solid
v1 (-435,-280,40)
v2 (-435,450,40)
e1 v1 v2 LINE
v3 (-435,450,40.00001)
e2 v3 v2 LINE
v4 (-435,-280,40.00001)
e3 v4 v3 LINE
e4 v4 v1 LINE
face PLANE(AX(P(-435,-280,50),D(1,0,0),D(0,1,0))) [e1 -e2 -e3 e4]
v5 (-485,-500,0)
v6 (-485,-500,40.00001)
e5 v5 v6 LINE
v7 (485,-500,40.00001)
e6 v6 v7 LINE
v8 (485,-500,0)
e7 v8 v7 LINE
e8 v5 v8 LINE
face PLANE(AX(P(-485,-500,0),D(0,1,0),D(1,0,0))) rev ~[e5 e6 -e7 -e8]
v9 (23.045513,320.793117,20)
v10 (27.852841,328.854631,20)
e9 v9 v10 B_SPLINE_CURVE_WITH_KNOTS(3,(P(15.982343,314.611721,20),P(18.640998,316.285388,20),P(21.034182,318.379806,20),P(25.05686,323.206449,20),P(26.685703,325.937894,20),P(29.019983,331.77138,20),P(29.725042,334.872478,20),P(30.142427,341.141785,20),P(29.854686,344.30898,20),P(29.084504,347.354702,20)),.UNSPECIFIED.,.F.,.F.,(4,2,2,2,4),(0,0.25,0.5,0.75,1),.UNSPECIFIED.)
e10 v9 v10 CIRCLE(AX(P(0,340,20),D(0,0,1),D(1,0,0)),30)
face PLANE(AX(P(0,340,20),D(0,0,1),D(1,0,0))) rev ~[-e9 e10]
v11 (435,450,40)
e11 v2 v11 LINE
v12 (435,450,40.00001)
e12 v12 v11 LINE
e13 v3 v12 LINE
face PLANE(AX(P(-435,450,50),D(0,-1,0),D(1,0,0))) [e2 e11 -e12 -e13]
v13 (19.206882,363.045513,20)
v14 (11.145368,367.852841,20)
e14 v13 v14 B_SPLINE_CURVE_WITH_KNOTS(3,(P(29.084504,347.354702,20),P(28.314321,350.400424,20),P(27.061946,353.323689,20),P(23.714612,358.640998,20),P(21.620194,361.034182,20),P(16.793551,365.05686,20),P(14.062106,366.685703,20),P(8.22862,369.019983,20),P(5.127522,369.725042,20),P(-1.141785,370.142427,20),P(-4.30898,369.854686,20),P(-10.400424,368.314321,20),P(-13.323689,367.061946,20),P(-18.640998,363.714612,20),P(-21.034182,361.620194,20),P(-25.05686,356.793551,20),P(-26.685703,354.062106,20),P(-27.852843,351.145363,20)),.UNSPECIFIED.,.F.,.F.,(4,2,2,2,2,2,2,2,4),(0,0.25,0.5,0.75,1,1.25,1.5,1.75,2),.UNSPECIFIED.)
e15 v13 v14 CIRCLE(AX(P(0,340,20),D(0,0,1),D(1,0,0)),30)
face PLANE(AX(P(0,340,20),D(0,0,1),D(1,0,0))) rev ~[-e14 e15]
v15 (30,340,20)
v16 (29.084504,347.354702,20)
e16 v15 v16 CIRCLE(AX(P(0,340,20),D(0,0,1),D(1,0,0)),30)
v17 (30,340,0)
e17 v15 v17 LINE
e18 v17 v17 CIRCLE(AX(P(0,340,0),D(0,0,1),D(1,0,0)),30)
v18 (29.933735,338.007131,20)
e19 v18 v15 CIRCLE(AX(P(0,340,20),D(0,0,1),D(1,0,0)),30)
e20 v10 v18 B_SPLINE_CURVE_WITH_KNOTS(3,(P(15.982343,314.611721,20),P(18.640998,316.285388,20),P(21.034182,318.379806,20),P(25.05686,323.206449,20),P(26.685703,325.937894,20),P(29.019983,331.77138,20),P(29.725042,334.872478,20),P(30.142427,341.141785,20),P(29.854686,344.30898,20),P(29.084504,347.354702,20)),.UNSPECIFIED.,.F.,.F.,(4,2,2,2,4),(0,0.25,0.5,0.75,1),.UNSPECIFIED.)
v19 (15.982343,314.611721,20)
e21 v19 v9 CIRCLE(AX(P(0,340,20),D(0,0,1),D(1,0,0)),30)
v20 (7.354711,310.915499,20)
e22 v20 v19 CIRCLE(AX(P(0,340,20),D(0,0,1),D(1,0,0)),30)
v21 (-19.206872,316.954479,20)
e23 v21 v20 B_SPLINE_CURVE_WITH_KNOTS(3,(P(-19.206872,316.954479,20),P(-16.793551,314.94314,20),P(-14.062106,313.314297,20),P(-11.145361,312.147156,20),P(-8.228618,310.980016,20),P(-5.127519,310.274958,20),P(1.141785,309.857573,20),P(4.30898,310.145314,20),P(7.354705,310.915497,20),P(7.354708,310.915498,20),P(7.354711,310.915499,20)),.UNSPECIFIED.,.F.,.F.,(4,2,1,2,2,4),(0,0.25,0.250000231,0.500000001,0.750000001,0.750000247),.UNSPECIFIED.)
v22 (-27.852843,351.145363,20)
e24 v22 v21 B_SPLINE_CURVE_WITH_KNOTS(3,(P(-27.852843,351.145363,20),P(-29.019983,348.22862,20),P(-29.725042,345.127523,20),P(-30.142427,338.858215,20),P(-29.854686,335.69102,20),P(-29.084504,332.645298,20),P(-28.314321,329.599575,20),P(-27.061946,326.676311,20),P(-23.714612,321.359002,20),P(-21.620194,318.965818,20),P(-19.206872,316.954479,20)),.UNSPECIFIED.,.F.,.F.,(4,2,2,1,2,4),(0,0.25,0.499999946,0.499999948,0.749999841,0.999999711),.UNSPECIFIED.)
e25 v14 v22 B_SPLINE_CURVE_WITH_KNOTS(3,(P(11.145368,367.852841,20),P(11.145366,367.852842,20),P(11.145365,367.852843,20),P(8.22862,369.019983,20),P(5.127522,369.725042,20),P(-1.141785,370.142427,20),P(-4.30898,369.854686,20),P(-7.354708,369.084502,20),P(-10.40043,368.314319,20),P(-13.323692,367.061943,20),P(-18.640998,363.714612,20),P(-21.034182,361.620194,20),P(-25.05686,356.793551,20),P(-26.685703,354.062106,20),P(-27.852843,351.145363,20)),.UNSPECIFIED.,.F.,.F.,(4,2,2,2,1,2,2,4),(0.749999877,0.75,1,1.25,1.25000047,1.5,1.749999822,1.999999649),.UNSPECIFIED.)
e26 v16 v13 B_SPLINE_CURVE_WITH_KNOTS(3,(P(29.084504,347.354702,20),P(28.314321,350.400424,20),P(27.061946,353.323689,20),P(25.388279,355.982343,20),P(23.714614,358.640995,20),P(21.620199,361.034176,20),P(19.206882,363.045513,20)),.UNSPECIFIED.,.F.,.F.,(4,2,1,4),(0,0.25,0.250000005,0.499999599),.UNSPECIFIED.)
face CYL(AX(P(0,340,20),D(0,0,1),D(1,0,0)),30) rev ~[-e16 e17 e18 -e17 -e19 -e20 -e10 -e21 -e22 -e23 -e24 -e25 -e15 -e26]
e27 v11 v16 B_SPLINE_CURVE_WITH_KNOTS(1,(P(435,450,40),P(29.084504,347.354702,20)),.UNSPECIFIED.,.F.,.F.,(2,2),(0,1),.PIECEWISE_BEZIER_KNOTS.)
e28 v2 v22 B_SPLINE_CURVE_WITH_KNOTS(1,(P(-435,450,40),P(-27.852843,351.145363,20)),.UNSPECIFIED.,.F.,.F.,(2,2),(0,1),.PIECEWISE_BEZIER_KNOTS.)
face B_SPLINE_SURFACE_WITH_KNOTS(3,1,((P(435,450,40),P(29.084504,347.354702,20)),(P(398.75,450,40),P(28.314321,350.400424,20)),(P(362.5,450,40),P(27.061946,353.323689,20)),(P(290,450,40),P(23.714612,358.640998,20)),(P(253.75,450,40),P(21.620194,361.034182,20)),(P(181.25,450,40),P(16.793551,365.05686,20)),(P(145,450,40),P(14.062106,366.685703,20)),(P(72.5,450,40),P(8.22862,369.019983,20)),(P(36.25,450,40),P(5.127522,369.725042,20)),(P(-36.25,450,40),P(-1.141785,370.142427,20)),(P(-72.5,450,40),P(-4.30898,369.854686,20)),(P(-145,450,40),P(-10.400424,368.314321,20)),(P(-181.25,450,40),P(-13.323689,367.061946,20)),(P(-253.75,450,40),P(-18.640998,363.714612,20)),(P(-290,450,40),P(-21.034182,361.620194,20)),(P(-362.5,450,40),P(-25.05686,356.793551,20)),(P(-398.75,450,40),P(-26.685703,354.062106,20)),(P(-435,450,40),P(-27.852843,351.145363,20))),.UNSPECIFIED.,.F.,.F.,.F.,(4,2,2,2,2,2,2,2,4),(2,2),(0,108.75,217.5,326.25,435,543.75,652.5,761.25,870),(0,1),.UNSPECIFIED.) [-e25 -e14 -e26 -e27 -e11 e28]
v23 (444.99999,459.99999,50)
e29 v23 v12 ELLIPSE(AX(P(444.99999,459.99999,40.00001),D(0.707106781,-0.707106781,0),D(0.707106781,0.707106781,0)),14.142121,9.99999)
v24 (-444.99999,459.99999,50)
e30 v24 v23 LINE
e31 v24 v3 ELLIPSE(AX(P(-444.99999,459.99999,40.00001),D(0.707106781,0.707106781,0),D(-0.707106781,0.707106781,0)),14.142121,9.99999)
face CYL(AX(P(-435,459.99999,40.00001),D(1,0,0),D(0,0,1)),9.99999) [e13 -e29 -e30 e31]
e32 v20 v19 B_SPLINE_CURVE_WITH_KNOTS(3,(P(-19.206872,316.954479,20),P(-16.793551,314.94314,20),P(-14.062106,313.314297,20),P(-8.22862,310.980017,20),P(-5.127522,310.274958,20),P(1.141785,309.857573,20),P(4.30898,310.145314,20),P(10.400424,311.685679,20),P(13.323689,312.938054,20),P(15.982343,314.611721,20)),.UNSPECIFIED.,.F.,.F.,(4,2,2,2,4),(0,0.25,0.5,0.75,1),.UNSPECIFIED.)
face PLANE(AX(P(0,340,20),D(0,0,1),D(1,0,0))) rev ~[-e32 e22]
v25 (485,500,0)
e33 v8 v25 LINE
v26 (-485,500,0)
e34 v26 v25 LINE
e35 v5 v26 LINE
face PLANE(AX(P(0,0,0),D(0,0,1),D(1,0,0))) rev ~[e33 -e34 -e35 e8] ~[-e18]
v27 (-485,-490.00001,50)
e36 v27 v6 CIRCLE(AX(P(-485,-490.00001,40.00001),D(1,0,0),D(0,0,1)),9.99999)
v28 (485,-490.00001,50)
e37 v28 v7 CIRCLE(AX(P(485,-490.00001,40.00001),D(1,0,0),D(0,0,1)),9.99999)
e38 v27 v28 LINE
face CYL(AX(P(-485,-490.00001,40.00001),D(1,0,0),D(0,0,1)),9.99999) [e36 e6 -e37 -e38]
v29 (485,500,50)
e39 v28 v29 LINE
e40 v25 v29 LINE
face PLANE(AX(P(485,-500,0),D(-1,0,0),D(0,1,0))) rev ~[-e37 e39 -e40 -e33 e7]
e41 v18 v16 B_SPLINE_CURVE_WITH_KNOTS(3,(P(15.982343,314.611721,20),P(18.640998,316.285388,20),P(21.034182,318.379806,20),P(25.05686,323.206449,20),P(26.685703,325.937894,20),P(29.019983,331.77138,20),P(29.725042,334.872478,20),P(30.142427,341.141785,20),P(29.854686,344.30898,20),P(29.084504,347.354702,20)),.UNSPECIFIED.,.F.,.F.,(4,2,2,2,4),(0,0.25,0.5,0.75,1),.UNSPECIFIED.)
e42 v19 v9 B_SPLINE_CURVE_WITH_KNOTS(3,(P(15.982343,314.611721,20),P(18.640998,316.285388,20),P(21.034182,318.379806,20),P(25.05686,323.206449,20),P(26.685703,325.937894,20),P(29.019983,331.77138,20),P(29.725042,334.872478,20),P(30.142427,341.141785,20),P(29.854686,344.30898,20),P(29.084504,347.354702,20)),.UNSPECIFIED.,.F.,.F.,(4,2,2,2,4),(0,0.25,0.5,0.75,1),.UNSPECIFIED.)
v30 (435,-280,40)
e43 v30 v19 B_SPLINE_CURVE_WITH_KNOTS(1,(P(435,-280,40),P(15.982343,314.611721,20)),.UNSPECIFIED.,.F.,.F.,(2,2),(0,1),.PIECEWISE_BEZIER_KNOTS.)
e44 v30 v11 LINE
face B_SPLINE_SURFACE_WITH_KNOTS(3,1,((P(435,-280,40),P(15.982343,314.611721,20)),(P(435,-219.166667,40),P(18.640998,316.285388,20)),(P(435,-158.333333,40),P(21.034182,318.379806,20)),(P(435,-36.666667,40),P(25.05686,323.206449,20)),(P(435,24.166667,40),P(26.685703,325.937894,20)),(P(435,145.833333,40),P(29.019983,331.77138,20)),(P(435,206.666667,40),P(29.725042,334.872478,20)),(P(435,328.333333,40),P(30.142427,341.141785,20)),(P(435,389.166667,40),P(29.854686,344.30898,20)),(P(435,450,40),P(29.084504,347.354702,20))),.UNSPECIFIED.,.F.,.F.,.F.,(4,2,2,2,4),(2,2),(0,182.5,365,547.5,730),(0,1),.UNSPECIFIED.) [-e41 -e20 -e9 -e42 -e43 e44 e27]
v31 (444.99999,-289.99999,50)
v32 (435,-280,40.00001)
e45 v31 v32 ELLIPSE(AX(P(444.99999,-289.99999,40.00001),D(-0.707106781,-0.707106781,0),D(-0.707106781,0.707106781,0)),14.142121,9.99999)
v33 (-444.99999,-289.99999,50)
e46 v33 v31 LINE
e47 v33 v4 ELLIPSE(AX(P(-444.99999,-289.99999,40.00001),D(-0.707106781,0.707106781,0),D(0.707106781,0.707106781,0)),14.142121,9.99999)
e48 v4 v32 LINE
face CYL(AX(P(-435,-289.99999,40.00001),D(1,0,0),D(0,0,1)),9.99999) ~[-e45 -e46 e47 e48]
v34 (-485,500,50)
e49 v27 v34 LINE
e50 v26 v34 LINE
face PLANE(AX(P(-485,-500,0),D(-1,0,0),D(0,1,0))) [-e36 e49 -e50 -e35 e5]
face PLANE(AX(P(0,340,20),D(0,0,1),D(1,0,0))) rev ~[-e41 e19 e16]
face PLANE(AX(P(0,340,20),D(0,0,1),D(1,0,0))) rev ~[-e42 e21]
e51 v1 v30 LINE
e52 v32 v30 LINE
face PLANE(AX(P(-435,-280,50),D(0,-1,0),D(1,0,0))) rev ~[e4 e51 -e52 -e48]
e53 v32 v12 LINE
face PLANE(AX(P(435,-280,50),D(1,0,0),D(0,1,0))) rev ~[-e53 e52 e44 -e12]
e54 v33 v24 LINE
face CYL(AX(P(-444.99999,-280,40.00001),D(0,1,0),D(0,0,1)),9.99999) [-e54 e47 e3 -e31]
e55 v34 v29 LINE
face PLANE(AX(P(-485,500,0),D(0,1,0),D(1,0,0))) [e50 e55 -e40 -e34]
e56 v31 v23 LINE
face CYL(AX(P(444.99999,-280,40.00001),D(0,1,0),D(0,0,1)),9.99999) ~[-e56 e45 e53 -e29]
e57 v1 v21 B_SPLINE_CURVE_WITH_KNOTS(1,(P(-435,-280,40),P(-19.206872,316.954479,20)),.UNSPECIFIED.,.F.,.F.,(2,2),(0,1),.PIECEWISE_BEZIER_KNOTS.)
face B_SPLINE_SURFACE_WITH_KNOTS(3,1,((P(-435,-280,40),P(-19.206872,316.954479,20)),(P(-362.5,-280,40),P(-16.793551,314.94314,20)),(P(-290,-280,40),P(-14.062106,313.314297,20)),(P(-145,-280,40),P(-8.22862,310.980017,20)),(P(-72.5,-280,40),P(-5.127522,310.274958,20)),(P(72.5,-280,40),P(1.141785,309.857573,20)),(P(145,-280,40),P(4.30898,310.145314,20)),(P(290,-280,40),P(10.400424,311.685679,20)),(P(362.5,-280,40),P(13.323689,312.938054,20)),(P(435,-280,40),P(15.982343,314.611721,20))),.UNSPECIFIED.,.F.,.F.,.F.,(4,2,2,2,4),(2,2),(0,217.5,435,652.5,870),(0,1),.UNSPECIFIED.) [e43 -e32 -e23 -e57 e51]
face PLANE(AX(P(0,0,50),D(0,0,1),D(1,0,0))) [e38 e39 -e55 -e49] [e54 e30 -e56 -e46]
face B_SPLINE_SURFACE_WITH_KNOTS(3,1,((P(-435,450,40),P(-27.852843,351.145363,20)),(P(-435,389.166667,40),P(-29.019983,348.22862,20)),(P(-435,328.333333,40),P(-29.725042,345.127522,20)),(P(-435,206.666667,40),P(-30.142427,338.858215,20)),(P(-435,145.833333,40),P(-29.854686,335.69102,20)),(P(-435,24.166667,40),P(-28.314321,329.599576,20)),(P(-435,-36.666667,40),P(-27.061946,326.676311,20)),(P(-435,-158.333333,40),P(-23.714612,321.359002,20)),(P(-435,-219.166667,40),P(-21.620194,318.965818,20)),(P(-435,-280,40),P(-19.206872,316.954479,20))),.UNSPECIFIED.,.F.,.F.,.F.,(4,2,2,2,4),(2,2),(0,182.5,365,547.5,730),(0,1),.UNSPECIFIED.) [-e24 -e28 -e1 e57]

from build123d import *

# Parameters (mm, degrees)
F0_W      = 970
F0_H      = 1000
F1_DEPTH  = 50
F2_W      = 870
F2_H      = 730
F5_DEPTH  = 10
F4_R      = 30
F14_DEPTH = 25
F15_R     = 9.99999


# Not quite as in the source:
# - a fillet or chamfer is up to 0.001 mm smaller than in the source, because OpenCascade refuses the exact size
# - the arcs of a loft's sections are written as splines that run evenly, so that the points pair up as in the source's solid


with BuildPart() as f1:
    # F0 (on Top) → F1 (new body)
    with BuildSketch(Plane.XY):
        Rectangle(F0_W, F0_H)
    extrude(amount=F1_DEPTH)

    # F2 (on face) → F5 (cut)
    with BuildSketch(Plane.XY.offset(50)):
        with Locations((0, 85)):
            Rectangle(F2_W, F2_H)
    extrude(amount=-F5_DEPTH, mode=Mode.SUBTRACT)

    # F12 (on 3pt) → F13 section 0
    with BuildSketch(Plane.XY.offset(40)):
        Polygon((435, -280), (435, 450), (0, 450), (-435, 450), (-435, -280), align=None)
    # F4 (on offset) → F13 section 1
    with BuildSketch(Plane.XY.offset(20)):
        with BuildLine():
            add(Edge.make_bspline(
                [(29.0845037285, 347.3547020923), (28.3143211264, 350.4004242005), (27.0619459332, 353.3236889303), (23.7146117851, 358.6409976204), (21.6201937161, 361.0341823725), (16.7935510128, 365.0568603137), (14.0621063014, 366.6857034902), (8.2286204599, 369.0199829381), (5.1275219455, 369.7250420202), (1.9928685748, 369.9337347293)],
                knots=[0, 0, 0, 0, 0.25, 0.25, 0.5, 0.5, 0.75, 0.75, 1, 1, 1, 1], degree=3))
            add(Edge.make_bspline(
                [(1.9928685748, 369.9337347293), (-1.1417847959, 370.1424274384), (-4.308979984, 369.8546863306), (-10.4004242005, 368.3143211264), (-13.3236889303, 367.0619459332), (-18.6409976204, 363.7146117851), (-21.0341823725, 361.6201937161), (-25.0568603137, 356.7935510128), (-26.6857034902, 354.0621063014), (-27.8528432142, 351.1453633807)],
                knots=[0, 0, 0, 0, 0.25, 0.25, 0.5, 0.5, 0.75, 0.75, 1, 1, 1, 1], degree=3))
            add(Edge.make_bspline(
                [(-27.8528432142, 351.1453633807), (-29.0199829381, 348.2286204599), (-29.7250420202, 345.1275219455), (-30.1424274384, 338.8582152041), (-29.8546863306, 335.691020016), (-28.3143211264, 329.5995757995), (-27.0619459332, 326.6763110697), (-23.7146117851, 321.3590023796), (-21.6201937161, 318.9658176275), (-19.2068723645, 316.9544786569)],
                knots=[0, 0, 0, 0, 0.25, 0.25, 0.5, 0.5, 0.75, 0.75, 1, 1, 1, 1], degree=3))
            add(Edge.make_bspline(
                [(-19.2068723645, 316.9544786569), (-16.7935510128, 314.9431396863), (-14.0621063014, 313.3142965098), (-8.2286204599, 310.9800170619), (-5.1275219455, 310.2749579798), (1.1417847959, 309.8575725616), (4.308979984, 310.1453136694), (10.4004242005, 311.6856788736), (13.3236889303, 312.9380540668), (15.9823432753, 314.6117211409)],
                knots=[0, 0, 0, 0, 0.25, 0.25, 0.5, 0.5, 0.75, 0.75, 1, 1, 1, 1], degree=3))
            add(Edge.make_bspline(
                [(15.9823432753, 314.6117211409), (18.6409976204, 316.2853882149), (21.0341823725, 318.3798062839), (25.0568603137, 323.2064489872), (26.6857034902, 325.9378936986), (29.0199829381, 331.7713795401), (29.7250420202, 334.8724780545), (30.1424274384, 341.1417847959), (29.8546863306, 344.308979984), (29.0845037285, 347.3547020923)],
                knots=[0, 0, 0, 0, 0.25, 0.25, 0.5, 0.5, 0.75, 0.75, 1, 1, 1, 1], degree=3))
        make_face()
    loft(ruled=True, mode=Mode.SUBTRACT)

    # F4 (on offset) → F14 (cut)
    with BuildSketch(Plane.XY.offset(20)):
        with Locations((0, 340)):
            Circle(F4_R)
    extrude(amount=-F14_DEPTH, mode=Mode.SUBTRACT)

    # F15 (radius 10 in the source; OpenCascade refuses exactly that, so slightly less here)
    f15_edges = [f1.edges().sort_by_distance(p)[0] for p in [
        (-435, 85, 50),
        (0, 450, 50),
        (435, 85, 50),
        (0, -280, 50),
        (0, -500, 50),
    ]]
    fillet(f15_edges, radius=F15_R)


solid = f1.part
